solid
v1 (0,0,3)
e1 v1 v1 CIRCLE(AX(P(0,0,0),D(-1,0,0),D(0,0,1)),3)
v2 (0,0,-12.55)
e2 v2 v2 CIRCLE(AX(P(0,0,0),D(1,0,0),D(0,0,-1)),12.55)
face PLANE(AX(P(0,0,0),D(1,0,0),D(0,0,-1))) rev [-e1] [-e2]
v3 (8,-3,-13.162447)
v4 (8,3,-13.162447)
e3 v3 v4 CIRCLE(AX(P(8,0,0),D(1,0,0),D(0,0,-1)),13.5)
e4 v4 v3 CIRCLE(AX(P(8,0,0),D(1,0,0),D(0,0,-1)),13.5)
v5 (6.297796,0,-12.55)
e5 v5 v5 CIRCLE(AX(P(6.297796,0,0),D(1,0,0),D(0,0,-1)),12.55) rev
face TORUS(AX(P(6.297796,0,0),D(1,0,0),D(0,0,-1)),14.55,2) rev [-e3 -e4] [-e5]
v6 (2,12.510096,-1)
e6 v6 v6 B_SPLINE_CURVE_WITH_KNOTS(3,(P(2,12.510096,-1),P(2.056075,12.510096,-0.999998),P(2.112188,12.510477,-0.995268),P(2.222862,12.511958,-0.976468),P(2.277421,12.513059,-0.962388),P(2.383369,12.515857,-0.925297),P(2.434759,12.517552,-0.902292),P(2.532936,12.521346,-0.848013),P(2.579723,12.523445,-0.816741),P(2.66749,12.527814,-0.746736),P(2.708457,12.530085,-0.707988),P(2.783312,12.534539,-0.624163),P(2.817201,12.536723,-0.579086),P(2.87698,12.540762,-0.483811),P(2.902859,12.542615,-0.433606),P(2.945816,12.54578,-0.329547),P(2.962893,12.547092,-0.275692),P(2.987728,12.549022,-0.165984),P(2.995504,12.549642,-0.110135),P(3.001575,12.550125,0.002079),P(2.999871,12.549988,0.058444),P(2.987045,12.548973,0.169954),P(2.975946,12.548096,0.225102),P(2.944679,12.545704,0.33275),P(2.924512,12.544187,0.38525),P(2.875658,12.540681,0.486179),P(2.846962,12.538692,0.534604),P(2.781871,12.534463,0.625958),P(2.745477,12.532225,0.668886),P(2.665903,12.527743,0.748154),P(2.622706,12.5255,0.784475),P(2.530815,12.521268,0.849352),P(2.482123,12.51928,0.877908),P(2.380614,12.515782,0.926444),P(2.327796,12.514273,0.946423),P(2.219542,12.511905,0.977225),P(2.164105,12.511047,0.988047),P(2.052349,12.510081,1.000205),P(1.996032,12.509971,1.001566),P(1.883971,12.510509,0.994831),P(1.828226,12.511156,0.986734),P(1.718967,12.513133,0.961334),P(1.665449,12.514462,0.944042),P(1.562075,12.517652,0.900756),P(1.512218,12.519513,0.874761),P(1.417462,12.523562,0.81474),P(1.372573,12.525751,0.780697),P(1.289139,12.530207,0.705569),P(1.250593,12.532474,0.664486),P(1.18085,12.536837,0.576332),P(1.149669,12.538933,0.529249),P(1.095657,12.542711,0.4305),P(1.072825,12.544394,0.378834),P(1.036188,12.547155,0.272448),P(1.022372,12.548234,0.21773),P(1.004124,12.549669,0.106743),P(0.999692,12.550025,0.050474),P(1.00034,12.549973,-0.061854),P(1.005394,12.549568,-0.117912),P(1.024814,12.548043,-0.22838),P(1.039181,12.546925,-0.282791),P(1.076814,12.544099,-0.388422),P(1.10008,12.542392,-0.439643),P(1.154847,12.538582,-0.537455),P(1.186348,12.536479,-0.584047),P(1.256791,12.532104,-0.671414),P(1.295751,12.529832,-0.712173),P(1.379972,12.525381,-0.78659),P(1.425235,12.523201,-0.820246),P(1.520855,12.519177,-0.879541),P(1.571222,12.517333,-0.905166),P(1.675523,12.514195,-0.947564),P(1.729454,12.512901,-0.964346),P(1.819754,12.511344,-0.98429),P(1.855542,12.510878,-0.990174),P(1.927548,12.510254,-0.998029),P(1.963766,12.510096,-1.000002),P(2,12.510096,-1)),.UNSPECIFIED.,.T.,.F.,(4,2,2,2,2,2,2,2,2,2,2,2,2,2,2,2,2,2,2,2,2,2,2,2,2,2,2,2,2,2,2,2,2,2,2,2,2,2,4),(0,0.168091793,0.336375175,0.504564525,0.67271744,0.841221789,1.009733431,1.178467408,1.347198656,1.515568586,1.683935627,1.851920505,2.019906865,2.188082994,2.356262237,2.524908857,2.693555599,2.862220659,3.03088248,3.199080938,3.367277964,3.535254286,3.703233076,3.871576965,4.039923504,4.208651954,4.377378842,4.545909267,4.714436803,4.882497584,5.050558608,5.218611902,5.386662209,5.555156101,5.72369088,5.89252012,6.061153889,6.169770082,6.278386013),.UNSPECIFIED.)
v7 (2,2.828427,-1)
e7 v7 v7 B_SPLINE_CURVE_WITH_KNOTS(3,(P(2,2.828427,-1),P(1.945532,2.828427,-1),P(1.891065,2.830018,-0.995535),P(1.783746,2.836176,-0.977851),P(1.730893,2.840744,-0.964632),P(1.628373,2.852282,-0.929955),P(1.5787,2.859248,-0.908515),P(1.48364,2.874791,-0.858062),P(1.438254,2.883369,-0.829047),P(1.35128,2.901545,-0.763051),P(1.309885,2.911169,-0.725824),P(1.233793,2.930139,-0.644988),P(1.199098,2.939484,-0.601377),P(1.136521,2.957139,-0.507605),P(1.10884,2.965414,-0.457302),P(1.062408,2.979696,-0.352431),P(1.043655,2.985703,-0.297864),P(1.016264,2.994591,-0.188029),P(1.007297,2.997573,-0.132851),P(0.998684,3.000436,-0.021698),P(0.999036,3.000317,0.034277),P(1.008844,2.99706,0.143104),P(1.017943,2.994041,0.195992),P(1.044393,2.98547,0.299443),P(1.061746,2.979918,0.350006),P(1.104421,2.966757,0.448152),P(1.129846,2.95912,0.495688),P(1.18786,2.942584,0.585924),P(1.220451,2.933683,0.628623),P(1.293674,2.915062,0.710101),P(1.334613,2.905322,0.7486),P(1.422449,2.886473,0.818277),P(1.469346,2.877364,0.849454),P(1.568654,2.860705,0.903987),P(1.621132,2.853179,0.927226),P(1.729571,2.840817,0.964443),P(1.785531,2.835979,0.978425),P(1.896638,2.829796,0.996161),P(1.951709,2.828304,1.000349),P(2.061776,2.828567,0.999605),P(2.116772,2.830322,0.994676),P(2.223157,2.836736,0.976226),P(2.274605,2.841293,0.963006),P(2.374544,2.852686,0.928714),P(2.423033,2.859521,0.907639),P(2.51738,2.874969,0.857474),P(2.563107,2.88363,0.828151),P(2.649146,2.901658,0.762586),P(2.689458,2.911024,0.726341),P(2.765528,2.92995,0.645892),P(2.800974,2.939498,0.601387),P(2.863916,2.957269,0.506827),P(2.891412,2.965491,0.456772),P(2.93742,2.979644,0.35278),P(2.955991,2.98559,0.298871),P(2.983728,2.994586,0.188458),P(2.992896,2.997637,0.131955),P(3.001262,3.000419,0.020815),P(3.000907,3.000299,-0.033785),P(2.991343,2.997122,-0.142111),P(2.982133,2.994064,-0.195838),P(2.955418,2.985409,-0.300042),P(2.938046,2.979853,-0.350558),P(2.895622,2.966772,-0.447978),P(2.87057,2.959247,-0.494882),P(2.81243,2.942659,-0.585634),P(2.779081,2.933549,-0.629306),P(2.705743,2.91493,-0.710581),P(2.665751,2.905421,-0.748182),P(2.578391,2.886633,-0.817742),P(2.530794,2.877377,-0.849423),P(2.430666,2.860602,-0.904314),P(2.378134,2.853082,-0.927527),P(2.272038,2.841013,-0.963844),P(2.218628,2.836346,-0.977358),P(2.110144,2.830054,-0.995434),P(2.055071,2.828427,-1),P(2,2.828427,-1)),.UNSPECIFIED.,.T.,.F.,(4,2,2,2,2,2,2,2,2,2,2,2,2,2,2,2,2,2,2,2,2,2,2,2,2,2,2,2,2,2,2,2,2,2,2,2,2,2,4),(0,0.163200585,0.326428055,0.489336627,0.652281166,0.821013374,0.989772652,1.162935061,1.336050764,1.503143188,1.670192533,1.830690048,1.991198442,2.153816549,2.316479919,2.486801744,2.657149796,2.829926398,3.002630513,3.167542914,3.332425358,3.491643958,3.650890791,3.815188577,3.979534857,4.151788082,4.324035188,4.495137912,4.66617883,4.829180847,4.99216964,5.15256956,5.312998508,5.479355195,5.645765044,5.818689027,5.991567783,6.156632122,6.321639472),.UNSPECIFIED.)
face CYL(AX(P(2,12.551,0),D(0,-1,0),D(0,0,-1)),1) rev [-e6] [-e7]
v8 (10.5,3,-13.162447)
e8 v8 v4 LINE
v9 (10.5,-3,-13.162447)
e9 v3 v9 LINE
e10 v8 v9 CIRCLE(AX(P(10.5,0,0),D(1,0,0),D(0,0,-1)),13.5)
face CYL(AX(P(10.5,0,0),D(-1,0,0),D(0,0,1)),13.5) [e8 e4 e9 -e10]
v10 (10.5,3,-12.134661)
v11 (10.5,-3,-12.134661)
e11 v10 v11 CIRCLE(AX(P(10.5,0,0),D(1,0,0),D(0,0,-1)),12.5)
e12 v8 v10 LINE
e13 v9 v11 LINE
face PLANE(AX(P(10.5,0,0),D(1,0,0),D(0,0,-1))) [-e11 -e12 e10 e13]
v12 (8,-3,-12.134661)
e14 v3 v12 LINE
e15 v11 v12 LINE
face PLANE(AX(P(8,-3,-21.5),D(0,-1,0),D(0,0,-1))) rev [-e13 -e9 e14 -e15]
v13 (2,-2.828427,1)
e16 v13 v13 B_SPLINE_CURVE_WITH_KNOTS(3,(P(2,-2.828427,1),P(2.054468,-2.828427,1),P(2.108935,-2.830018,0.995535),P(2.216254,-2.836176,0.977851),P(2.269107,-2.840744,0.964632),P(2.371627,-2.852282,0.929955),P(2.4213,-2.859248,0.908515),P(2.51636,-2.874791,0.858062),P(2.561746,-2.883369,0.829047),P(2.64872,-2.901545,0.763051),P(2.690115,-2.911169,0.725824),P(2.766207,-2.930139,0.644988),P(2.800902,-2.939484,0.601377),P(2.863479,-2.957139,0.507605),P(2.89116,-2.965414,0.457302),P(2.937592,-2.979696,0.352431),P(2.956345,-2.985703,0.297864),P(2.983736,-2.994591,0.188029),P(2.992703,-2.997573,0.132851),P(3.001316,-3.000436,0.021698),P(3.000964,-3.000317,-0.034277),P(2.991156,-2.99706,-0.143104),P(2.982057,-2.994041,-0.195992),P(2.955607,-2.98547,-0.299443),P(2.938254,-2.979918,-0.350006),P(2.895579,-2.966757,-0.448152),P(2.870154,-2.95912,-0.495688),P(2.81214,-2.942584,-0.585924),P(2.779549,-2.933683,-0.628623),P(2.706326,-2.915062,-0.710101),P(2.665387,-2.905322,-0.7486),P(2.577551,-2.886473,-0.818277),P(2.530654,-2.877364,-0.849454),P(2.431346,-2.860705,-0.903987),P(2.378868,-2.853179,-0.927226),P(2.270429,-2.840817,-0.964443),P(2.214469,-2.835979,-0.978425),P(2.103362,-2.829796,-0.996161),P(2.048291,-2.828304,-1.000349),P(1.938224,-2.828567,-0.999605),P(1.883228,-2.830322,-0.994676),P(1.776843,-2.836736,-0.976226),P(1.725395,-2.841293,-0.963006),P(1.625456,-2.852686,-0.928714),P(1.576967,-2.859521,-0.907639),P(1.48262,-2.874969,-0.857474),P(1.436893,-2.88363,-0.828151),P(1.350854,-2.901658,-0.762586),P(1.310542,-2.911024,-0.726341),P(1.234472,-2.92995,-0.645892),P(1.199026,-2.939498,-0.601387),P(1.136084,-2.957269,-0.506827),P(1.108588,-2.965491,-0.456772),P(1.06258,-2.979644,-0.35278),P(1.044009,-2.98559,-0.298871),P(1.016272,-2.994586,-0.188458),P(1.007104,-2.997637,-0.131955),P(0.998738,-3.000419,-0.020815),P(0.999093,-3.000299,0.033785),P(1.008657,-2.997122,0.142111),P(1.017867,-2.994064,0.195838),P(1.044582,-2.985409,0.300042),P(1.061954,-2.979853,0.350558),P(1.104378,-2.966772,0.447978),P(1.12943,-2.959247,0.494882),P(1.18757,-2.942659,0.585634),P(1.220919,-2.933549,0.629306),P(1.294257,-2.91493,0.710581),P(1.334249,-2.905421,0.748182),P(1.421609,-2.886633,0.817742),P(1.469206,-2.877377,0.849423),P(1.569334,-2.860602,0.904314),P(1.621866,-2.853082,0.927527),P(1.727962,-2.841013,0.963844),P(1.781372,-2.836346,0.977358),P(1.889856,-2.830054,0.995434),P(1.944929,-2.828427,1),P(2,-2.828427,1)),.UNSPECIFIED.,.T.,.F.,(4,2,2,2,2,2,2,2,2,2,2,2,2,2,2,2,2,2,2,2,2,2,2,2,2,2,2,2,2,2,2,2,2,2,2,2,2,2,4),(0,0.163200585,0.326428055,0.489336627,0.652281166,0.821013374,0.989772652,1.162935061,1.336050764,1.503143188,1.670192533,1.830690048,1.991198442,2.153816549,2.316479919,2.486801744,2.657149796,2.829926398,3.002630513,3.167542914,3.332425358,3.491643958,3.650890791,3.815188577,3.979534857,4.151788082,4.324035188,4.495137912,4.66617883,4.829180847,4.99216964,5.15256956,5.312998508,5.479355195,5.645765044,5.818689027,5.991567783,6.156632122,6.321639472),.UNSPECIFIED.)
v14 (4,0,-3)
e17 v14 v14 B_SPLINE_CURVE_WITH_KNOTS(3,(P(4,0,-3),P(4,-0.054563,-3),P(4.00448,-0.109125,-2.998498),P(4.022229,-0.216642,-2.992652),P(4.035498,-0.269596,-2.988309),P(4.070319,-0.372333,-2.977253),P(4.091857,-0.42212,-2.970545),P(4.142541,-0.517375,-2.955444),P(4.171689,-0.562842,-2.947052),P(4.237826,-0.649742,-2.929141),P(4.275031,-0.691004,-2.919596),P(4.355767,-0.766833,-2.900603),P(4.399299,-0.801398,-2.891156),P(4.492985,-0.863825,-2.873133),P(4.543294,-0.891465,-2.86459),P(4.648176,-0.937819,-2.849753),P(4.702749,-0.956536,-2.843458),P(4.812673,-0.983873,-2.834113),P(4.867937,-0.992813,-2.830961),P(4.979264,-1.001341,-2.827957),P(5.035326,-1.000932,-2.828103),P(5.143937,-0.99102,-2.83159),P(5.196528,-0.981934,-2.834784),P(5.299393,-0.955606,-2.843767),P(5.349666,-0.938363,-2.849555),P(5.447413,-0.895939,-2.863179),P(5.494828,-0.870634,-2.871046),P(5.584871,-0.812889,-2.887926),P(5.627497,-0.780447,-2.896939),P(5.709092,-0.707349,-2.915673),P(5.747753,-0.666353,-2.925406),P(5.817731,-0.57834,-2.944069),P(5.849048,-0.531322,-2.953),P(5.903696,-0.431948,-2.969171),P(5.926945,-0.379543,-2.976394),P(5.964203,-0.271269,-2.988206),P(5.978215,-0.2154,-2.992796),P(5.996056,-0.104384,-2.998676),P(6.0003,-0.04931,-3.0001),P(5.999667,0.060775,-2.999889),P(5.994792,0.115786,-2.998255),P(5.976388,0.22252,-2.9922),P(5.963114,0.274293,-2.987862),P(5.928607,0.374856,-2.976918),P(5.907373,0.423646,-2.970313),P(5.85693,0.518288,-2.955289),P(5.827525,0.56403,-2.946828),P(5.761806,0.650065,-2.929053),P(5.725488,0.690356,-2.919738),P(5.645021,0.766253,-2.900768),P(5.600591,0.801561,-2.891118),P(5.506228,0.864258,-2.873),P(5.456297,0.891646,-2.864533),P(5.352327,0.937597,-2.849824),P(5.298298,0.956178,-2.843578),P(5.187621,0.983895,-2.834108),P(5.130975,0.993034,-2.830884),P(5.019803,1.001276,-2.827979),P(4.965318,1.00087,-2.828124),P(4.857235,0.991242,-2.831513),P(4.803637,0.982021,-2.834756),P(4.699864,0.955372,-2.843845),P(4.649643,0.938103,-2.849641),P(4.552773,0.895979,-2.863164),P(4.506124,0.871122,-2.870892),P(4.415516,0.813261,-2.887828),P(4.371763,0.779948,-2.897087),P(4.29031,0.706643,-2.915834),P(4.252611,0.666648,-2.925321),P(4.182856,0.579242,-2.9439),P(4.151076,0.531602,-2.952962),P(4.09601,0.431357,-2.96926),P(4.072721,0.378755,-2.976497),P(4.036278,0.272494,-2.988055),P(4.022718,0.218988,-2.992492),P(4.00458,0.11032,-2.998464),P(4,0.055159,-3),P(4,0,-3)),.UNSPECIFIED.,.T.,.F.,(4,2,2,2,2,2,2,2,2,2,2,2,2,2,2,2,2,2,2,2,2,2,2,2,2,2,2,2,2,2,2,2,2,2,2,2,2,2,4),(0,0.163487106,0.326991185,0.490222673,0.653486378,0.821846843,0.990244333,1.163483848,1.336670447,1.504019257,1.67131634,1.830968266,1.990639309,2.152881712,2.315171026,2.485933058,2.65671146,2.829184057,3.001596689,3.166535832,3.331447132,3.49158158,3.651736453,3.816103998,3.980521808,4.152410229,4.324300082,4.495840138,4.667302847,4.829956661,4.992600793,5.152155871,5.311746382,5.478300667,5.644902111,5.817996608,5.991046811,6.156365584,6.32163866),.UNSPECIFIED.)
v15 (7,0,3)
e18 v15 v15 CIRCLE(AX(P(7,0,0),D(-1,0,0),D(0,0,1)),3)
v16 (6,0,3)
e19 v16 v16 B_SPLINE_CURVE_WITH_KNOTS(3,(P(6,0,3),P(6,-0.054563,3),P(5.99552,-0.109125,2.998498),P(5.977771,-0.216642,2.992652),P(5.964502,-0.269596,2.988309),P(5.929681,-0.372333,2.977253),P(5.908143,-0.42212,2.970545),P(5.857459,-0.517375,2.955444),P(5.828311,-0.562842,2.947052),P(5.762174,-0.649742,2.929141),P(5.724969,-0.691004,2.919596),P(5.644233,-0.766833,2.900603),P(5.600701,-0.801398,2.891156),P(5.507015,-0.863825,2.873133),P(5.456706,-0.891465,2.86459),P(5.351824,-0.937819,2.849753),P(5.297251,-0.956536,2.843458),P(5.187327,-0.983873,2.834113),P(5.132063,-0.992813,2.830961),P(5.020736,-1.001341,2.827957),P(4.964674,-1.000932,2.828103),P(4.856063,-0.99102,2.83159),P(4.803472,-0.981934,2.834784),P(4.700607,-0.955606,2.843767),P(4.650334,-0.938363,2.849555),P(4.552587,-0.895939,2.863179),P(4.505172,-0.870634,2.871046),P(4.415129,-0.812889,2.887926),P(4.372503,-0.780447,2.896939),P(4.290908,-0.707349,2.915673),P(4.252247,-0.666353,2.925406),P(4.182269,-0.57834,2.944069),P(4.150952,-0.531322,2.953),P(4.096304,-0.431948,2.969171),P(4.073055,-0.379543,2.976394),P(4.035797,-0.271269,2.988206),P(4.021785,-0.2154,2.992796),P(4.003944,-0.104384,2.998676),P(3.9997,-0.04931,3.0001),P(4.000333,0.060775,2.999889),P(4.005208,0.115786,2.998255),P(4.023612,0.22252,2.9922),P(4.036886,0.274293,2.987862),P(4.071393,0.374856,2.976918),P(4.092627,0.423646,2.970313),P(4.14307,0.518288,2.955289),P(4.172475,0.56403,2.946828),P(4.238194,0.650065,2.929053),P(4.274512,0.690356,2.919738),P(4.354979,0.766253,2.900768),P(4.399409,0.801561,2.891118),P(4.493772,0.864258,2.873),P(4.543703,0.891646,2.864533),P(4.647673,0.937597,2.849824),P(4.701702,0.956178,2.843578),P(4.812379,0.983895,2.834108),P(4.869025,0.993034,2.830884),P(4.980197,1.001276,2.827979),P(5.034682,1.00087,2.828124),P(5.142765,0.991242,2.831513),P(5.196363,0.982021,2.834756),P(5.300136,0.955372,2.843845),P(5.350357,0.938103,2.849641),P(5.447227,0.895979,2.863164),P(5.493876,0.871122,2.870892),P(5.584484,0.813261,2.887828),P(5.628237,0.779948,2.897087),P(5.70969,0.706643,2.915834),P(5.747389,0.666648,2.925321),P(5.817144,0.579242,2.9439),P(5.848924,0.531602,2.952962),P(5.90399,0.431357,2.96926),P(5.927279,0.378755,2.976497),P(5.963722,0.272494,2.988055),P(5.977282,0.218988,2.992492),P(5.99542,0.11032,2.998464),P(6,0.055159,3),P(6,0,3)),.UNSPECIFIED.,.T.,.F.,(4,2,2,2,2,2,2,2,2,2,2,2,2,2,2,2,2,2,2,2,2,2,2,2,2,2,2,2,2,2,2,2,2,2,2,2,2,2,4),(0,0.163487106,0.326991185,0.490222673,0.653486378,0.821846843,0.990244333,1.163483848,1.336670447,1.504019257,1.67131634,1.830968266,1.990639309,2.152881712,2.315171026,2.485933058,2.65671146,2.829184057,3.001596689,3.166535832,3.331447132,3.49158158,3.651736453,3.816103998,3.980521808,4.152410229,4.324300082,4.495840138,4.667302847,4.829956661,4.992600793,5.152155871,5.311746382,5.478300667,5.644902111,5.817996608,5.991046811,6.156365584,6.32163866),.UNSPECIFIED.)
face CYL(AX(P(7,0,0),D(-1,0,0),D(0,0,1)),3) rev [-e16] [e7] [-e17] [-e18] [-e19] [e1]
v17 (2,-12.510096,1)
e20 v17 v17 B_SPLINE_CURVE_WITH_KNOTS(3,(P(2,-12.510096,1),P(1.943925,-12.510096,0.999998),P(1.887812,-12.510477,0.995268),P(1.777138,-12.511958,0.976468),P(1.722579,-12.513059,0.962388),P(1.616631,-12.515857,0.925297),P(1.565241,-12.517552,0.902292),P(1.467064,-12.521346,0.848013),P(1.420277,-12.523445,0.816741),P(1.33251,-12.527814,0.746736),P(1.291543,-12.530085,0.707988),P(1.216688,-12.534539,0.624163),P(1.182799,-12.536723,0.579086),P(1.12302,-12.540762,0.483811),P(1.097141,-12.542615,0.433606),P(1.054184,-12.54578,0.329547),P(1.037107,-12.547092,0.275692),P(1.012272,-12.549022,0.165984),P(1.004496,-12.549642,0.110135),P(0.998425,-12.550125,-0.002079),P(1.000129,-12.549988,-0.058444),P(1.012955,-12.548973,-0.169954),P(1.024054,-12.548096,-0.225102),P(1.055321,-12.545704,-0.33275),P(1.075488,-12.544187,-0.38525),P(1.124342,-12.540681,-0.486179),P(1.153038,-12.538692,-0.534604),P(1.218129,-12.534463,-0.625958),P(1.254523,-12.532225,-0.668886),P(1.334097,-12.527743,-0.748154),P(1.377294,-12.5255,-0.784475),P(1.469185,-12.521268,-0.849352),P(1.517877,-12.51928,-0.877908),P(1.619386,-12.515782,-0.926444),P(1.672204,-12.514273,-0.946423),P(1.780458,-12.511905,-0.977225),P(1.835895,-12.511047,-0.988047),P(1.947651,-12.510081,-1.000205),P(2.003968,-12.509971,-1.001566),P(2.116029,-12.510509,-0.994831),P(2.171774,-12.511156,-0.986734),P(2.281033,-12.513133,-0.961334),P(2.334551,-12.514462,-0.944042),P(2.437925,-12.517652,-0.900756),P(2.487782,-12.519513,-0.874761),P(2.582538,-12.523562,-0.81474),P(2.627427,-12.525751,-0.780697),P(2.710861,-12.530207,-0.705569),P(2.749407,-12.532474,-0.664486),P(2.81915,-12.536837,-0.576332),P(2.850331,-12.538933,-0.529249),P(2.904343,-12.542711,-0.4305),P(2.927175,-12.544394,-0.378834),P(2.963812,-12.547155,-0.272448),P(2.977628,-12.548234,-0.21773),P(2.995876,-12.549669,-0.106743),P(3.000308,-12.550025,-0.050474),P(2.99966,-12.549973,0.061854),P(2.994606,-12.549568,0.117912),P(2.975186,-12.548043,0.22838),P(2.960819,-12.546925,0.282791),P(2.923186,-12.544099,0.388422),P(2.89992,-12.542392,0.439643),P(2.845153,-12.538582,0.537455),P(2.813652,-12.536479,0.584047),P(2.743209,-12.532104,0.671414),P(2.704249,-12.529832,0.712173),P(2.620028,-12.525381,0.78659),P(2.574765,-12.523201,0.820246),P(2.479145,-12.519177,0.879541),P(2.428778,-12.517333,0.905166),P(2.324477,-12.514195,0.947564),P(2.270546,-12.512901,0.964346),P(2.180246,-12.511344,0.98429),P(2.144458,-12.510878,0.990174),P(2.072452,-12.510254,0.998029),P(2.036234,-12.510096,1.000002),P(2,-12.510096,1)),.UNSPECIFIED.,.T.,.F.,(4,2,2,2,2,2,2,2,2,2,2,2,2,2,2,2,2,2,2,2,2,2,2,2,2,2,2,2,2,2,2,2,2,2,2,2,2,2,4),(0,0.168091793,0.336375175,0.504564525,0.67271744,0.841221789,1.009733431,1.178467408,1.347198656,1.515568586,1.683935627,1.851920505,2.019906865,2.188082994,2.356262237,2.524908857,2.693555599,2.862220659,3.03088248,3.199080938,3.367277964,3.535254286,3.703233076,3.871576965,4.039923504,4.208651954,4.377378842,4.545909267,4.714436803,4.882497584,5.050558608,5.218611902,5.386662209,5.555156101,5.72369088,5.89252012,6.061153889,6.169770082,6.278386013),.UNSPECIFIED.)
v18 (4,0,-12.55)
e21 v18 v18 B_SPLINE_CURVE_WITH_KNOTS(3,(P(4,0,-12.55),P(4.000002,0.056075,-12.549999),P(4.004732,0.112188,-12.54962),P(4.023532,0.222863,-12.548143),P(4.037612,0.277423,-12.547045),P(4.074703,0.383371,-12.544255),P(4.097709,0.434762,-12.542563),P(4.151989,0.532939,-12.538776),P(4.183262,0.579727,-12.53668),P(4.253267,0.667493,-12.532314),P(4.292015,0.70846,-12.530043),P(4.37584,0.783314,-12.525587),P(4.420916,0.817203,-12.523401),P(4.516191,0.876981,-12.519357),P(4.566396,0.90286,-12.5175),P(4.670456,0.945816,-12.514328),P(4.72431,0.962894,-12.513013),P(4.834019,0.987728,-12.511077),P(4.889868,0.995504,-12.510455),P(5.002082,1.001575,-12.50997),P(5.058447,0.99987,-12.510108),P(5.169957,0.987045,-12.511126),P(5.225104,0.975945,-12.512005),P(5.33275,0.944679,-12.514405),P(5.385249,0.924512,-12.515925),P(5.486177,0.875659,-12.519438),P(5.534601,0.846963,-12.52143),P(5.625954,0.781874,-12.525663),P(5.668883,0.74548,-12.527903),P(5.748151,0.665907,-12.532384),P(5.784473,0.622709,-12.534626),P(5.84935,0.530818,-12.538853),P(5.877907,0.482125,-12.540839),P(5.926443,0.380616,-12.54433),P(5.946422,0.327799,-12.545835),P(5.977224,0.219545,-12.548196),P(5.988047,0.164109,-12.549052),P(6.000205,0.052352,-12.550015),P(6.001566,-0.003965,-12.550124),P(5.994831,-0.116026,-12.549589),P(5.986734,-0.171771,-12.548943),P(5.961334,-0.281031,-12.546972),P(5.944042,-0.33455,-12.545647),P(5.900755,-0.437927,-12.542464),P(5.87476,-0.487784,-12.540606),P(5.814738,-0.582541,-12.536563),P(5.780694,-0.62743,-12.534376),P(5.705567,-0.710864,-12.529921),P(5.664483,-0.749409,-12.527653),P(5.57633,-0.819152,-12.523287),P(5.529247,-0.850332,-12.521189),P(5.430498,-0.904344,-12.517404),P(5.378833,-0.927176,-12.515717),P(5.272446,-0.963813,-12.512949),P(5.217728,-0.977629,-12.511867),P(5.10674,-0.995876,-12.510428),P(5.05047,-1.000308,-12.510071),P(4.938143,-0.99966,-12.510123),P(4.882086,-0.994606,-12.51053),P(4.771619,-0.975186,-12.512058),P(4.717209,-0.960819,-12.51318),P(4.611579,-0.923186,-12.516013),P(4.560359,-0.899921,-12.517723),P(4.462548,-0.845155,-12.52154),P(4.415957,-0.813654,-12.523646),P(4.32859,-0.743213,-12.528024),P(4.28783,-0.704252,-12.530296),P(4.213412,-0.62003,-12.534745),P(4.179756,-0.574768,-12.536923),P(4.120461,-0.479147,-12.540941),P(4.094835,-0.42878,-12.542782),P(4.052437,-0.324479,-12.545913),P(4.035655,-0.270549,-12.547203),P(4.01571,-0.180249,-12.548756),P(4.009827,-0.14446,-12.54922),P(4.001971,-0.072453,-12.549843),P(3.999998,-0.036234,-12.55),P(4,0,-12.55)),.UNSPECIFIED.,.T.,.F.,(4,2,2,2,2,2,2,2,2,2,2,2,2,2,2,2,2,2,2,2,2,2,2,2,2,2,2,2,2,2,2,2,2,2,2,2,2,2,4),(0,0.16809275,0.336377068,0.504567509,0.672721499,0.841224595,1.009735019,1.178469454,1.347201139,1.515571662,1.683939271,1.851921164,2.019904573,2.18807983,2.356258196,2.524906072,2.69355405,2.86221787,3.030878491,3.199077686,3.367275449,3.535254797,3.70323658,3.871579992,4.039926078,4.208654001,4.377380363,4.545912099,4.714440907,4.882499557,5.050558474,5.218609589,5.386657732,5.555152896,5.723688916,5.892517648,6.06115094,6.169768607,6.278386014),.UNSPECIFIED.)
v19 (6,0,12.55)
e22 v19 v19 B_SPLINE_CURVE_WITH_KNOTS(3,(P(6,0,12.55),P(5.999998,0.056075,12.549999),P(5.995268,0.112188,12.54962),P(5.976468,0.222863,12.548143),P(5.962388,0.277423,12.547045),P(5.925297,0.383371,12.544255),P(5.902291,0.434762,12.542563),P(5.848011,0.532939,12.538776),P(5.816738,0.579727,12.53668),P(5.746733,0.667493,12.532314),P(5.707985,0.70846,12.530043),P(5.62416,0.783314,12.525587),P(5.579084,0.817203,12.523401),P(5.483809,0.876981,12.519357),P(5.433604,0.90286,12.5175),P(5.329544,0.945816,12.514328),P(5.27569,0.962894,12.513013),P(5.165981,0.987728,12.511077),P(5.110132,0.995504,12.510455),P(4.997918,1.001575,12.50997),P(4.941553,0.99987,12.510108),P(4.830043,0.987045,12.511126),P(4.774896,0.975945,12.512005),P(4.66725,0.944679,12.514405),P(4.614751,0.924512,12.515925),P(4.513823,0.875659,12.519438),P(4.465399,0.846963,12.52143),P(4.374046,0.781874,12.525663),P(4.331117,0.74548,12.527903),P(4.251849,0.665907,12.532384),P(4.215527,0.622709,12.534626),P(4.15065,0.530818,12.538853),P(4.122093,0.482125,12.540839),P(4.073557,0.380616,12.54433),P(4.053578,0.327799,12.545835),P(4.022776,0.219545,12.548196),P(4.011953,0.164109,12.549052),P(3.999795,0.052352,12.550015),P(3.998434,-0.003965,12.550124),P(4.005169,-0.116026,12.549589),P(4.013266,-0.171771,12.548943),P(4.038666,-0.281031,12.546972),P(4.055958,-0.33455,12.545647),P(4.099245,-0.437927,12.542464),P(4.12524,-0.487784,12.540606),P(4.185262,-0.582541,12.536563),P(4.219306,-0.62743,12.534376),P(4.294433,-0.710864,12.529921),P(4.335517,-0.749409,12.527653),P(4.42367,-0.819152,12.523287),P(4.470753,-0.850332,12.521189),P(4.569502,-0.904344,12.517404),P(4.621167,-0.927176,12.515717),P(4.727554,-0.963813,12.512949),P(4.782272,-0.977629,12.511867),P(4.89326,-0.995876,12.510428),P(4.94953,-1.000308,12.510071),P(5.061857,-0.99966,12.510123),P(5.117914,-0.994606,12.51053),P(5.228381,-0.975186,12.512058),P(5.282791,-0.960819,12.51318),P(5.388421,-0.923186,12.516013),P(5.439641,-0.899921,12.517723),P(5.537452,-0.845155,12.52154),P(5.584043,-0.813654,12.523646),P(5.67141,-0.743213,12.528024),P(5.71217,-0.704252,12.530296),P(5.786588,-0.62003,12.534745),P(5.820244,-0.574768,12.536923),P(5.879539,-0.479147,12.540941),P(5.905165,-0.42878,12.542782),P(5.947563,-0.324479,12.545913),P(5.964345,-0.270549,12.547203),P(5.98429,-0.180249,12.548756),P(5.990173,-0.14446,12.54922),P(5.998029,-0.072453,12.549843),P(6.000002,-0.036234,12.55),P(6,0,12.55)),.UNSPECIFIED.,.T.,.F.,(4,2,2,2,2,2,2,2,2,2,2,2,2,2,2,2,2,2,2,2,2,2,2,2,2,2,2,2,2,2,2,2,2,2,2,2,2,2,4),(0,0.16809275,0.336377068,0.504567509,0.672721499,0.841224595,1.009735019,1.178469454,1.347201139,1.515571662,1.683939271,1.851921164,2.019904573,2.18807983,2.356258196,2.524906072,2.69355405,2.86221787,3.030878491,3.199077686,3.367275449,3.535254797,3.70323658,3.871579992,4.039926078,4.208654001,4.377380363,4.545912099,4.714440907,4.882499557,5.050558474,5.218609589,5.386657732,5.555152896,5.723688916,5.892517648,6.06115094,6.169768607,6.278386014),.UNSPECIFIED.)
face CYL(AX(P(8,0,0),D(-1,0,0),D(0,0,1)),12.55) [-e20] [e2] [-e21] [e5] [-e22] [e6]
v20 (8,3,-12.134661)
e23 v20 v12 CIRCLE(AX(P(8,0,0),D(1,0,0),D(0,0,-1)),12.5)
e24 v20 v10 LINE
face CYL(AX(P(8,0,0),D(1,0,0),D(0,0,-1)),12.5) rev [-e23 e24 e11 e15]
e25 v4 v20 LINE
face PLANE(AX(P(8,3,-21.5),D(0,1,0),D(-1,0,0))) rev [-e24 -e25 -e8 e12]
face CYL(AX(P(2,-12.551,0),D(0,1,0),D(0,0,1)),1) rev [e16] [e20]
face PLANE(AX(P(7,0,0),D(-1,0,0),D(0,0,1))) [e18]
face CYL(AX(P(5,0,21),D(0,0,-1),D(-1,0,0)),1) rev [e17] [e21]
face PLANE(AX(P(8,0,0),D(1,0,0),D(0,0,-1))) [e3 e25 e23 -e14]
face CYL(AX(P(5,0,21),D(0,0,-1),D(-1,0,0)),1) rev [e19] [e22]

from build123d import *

# Parameters (mm, degrees)
SKETCH_1_R                      = 12.55
EXTRUDE_1_DEPTH                 = 8
SKETCH_2_R                      = 3
CUT_EXTRUDE_1_DEPTH             = 7
CUT_EXTRUDE_2_REACH             = 21.468
SKETCH_3_R                      = 1
CUT_EXTRUDE_2_DIRECTION_2_REACH = 21.468
CUT_EXTRUDE_3_DEPTH             = 21
CUT_EXTRUDE_3_DEPTH_BACK        = 19
SKETCH_4_R                      = 1
SKETCH_5_R                      = 13.5
EXTRUDE_2_DEPTH                 = 2.5
SKETCH_6_R                      = 12.5
CUT_EXTRUDE_4_DEPTH             = 2.5
FILLET_1_R                      = 2
SKETCH_7_W                      = 2.5
SKETCH_7_H                      = 6
CUT_EXTRUDE_5_DEPTH             = 21.5


with BuildPart() as part:
    # 草图1 → 凸台-拉伸1 (new body)
    with BuildSketch(Plane(origin=(0, 0, 0), x_dir=(0, 0, -1), z_dir=(1, 0, 0))):
        Circle(SKETCH_1_R)
    extrude(amount=EXTRUDE_1_DEPTH)

    # 草图2 → 切除-拉伸1 (cut)
    with BuildSketch(Plane.ZY):
        Circle(SKETCH_2_R)
    extrude(amount=-CUT_EXTRUDE_1_DEPTH, mode=Mode.SUBTRACT)

    # 草图3 → 切除-拉伸2 (cut, up to next)
    with BuildSketch(Plane(origin=(0, 0, 0), x_dir=(1, 0, 0), z_dir=(0, 1, 0)), mode=Mode.PRIVATE) as cut_extrude_2_sk1:
        with Locations(Location((2, 0, 0), (0, 0, 270))):
            Circle(SKETCH_3_R)
    cut_extrude_2_tool1 = extrude(cut_extrude_2_sk1.sketch, amount=-CUT_EXTRUDE_2_REACH, mode=Mode.PRIVATE) & part.part
    add(cut_extrude_2_tool1.solids().sort_by_distance((2, 0, 0))[0], mode=Mode.SUBTRACT)

    # 草图3 → 切除-拉伸2 direction 2 (cut, up to next)
    with BuildSketch(Plane(origin=(0, 0, 0), x_dir=(1, 0, 0), z_dir=(0, 1, 0)), mode=Mode.PRIVATE) as cut_extrude_2_direction_2_sk1:
        with Locations(Location((2, 0, 0), (0, 0, 270))):
            Circle(SKETCH_3_R)
    cut_extrude_2_direction_2_tool1 = extrude(cut_extrude_2_direction_2_sk1.sketch, amount=CUT_EXTRUDE_2_DIRECTION_2_REACH, mode=Mode.PRIVATE) & part.part
    add(cut_extrude_2_direction_2_tool1.solids().sort_by_distance((2, 0, 0))[0], mode=Mode.SUBTRACT)

    # 草图4 → 切除-拉伸3 (cut, two sides: drawn at the far end of the back side and taken through both)
    with BuildSketch(Plane.XY.offset(-CUT_EXTRUDE_3_DEPTH_BACK)):
        with Locations(Location((5, 0, 0), (0, 0, 180))):
            Circle(SKETCH_4_R)
    extrude(amount=CUT_EXTRUDE_3_DEPTH + CUT_EXTRUDE_3_DEPTH_BACK, mode=Mode.SUBTRACT)

    # 草图5 → 凸台-拉伸2 (add)
    with BuildSketch(Plane(origin=(8, 0, 0), x_dir=(0, 0, -1), z_dir=(1, 0, 0))):
        Circle(SKETCH_5_R)
    extrude(amount=EXTRUDE_2_DEPTH)

    # 草图6 → 切除-拉伸4 (cut)
    with BuildSketch(Plane(origin=(10.5, 0, 0), x_dir=(0, 0, -1), z_dir=(1, 0, 0))):
        Circle(SKETCH_6_R)
    extrude(amount=-CUT_EXTRUDE_4_DEPTH, mode=Mode.SUBTRACT)

    # 圆角1
    # the kernel refuses this fillet: 2 mm, written as the material it adds along each edge
    with BuildSketch(Plane(origin=(8, 0, 0), x_dir=(0, 0, -1), z_dir=(0, -1, 0))) as fillet_1_piece_1:
        with BuildLine():
            CenterArc((14.55, -1.702204453), FILLET_1_R, 121.668243254, 58.331756746)
            Line((12.55, -1.702204453), (12.51, -1.702204453))
            Line((12.51, -1.702204453), (12.51, 0))
            Line((12.51, 0), (12.55, 0.04))
            ThreePointArc((12.55, 0.04), (13.025, 0.04), (13.479, 0.034044089))
            Line((13.479, 0.034044089), (13.5, 0))
        make_face()
    revolve(axis=Axis((8, 0, 0), (1, 0, 0)))

    # 草图7 → 切除-拉伸5 (cut)
    with BuildSketch(Plane.XY):
        with Locations((9.25, 0)):
            Rectangle(SKETCH_7_W, SKETCH_7_H)
    extrude(amount=-CUT_EXTRUDE_5_DEPTH, mode=Mode.SUBTRACT)


solid = part.part
